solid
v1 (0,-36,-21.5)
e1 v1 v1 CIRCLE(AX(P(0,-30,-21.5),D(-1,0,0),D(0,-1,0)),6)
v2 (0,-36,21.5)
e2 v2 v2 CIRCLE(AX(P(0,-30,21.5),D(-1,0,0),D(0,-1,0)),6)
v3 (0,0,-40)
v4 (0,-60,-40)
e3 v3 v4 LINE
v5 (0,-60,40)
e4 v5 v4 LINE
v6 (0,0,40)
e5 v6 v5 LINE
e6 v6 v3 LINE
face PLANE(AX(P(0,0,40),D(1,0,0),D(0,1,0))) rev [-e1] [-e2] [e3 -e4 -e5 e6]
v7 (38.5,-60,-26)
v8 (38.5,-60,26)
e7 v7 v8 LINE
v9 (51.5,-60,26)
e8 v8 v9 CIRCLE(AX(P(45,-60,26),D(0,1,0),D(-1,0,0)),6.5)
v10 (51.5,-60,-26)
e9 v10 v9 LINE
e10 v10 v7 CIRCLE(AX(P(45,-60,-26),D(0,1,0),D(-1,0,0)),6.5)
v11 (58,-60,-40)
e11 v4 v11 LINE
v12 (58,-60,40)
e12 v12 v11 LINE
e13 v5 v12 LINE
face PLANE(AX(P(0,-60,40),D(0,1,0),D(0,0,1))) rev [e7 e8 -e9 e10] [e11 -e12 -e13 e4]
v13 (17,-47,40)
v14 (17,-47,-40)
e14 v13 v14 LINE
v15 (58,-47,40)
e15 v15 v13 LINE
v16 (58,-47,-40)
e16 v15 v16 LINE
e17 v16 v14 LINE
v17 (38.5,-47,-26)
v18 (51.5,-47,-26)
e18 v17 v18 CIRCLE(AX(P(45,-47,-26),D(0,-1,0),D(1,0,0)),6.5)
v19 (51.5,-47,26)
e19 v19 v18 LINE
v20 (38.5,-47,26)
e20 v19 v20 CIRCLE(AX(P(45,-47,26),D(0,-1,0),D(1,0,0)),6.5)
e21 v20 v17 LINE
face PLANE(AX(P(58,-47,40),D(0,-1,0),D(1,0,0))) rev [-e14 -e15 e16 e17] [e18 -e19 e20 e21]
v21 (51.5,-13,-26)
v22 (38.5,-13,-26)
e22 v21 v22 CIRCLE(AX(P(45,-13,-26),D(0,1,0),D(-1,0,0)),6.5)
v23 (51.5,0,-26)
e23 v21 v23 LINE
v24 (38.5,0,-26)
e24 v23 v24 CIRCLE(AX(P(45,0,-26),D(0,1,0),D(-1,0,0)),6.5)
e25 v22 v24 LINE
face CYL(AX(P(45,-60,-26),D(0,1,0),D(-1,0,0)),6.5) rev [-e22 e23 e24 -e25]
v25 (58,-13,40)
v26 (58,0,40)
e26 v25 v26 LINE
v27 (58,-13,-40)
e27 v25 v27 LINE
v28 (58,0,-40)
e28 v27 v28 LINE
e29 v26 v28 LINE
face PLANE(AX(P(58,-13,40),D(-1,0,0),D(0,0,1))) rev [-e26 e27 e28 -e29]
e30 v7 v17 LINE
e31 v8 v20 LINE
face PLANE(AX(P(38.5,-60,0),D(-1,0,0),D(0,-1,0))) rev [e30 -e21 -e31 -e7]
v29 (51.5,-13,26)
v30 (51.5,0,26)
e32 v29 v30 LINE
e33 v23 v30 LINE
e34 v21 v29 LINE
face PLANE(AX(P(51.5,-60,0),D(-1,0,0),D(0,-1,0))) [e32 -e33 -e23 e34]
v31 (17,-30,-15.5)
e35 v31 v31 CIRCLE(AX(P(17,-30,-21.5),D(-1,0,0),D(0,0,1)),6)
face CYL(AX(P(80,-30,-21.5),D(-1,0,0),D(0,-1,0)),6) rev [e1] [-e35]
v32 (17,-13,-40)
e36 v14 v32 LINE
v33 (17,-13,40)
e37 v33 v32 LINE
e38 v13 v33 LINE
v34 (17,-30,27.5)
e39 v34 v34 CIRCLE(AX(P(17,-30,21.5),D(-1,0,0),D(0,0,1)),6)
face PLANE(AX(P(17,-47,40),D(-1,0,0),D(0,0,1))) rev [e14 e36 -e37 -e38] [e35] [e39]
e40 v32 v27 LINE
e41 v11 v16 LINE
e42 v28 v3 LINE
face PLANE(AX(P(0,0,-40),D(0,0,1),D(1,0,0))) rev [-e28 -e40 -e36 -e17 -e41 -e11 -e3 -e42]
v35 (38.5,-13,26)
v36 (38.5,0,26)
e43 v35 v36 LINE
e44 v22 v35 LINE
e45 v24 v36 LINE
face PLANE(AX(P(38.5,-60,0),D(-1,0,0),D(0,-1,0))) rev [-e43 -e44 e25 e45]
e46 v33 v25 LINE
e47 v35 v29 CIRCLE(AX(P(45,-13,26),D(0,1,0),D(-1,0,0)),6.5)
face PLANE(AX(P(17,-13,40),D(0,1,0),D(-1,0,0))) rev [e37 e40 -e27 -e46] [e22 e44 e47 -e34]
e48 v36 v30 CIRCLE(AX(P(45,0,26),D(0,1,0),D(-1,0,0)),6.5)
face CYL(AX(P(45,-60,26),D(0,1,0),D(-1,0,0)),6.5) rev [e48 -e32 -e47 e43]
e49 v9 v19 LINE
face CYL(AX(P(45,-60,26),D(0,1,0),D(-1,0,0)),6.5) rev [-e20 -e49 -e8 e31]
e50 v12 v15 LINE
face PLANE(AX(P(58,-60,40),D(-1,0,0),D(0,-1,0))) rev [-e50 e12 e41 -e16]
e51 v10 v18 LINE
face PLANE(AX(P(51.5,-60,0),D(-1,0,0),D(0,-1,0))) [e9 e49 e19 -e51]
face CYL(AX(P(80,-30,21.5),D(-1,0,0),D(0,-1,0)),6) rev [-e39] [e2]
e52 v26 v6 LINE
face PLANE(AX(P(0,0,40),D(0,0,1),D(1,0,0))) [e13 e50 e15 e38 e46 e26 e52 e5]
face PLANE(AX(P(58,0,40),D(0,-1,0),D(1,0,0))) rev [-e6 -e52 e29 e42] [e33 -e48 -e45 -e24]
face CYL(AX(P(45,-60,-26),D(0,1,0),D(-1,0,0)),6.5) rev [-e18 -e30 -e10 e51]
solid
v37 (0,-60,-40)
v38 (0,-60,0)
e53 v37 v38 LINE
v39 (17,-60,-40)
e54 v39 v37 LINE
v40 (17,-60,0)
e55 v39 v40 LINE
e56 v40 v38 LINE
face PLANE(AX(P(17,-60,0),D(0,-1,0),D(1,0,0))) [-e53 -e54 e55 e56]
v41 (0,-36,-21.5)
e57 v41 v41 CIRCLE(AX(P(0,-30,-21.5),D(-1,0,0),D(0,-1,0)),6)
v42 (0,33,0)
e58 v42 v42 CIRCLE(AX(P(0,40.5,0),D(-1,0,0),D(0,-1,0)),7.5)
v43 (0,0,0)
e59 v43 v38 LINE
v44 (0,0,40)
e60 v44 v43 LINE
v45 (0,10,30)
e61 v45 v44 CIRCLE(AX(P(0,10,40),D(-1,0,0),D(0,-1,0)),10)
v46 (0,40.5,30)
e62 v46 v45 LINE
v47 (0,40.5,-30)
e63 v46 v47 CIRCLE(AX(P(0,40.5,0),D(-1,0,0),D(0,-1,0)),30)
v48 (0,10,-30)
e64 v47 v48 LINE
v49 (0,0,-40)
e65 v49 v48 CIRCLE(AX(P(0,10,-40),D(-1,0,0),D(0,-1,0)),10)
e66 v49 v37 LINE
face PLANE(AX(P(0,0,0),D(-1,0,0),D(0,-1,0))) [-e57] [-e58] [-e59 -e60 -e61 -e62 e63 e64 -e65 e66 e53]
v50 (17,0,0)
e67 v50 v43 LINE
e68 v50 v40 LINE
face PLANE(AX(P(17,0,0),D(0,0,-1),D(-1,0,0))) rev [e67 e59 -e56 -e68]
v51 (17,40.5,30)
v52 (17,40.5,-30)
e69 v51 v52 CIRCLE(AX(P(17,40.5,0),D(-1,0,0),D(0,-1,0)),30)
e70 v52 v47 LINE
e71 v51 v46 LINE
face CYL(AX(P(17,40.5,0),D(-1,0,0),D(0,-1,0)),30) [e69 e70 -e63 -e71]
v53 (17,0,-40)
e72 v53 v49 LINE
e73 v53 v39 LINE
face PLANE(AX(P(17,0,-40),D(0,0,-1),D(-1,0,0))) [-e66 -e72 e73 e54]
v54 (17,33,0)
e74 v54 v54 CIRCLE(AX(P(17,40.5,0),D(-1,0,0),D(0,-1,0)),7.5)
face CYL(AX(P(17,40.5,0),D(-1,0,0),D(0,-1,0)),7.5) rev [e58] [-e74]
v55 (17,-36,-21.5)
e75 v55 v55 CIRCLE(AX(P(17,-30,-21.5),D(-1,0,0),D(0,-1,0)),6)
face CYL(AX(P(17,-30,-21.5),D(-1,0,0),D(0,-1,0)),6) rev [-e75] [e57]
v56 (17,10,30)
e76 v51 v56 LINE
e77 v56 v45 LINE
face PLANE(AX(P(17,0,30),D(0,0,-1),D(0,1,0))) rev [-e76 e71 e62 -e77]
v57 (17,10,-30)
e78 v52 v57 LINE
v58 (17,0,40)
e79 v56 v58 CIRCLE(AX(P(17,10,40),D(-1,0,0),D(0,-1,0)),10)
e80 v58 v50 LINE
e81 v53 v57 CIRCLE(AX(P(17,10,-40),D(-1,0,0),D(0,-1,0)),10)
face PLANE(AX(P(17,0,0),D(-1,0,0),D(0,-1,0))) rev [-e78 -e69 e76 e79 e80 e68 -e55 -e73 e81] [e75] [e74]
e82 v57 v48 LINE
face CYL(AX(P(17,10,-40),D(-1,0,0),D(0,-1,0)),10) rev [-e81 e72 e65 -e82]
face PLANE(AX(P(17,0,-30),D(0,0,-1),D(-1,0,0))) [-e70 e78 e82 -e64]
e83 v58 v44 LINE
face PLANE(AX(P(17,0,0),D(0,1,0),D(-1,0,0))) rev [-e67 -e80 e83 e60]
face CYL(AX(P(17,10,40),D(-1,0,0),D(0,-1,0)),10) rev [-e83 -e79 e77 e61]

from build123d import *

# Parameters (mm, degrees)
BOSS_EXTRUDE1_DEPTH       = 40
SKETCH10_R                = 6
CUT_EXTRUDE1_DEPTH        = 80
BOSS_EXTRUDE2_START       = -17
BOSS_EXTRUDE2_OUTLINE_R   = 6
BOSS_EXTRUDE2_OUTLINE_R_2 = 7.5
BOSS_EXTRUDE2_DEPTH       = 17
CUT_EXTRUDE3_DEPTH        = 100.670707833


# Read off the part's stored shape, not the designer's step: Boss-Extrude2
with BuildPart() as part:
    # Sketch9 → Boss-Extrude1 (new, symmetric)
    with BuildSketch(Plane.XY):
        Polygon((0, 0), (0, -60), (58, -60), (58, -47), (17, -47), (17, -13), (58, -13), (58, 0), align=None)
    extrude(amount=BOSS_EXTRUDE1_DEPTH, both=True)

    # Sketch10 → Cut-Extrude1 (cut)
    with BuildSketch(Plane.ZY):
        with Locations(Location((-21.5, -30, 0), (0, 0, 270))):
            Circle(SKETCH10_R)
        with Locations(Location((21.5, -30, 0), (0, 0, 270))):
            Circle(SKETCH10_R)
    extrude(amount=-CUT_EXTRUDE1_DEPTH, mode=Mode.SUBTRACT)

    # Sketch11 → Cut-Extrude3 (cut, through all)
    with BuildSketch(Plane(origin=(0, 0, 0), x_dir=(1, 0, 0), z_dir=(0, 1, 0))):
        with BuildLine():
            Line((51.5, 26), (51.5, -26))
            ThreePointArc((51.5, -26), (45, -32.5), (38.5, -26))
            Line((38.5, -26), (38.5, 26))
            ThreePointArc((38.5, 26), (45, 32.5), (51.5, 26))
        make_face()
    extrude(amount=-CUT_EXTRUDE3_DEPTH, mode=Mode.SUBTRACT)


with BuildPart() as body_2:
    # Boss-Extrude2 outline → Boss-Extrude2 (new body)
    with BuildSketch(Plane.ZY.offset(BOSS_EXTRUDE2_START)):
        with BuildLine():
            Line((0, -60), (0, 0))
            Line((0, 0), (40, 0))
            ThreePointArc((40, 0), (32.928932188, 2.928932188), (30, 10))
            Line((30, 10), (30, 40.5))
            ThreePointArc((30, 40.5), (0, 70.5), (-30, 40.5))
            Line((-30, 40.5), (-30, 10))
            ThreePointArc((-30, 10), (-32.928932188, 2.928932188), (-40, 0))
            Line((-40, 0), (-40, -60))
            Line((-40, -60), (0, -60))
        make_face()
        with Locations((-21.5, -30)):
            Circle(BOSS_EXTRUDE2_OUTLINE_R, mode=Mode.SUBTRACT)
        with Locations((0, 40.5)):
            Circle(BOSS_EXTRUDE2_OUTLINE_R_2, mode=Mode.SUBTRACT)
    extrude(amount=BOSS_EXTRUDE2_DEPTH)


solid = Compound([part.part, body_2.part])
